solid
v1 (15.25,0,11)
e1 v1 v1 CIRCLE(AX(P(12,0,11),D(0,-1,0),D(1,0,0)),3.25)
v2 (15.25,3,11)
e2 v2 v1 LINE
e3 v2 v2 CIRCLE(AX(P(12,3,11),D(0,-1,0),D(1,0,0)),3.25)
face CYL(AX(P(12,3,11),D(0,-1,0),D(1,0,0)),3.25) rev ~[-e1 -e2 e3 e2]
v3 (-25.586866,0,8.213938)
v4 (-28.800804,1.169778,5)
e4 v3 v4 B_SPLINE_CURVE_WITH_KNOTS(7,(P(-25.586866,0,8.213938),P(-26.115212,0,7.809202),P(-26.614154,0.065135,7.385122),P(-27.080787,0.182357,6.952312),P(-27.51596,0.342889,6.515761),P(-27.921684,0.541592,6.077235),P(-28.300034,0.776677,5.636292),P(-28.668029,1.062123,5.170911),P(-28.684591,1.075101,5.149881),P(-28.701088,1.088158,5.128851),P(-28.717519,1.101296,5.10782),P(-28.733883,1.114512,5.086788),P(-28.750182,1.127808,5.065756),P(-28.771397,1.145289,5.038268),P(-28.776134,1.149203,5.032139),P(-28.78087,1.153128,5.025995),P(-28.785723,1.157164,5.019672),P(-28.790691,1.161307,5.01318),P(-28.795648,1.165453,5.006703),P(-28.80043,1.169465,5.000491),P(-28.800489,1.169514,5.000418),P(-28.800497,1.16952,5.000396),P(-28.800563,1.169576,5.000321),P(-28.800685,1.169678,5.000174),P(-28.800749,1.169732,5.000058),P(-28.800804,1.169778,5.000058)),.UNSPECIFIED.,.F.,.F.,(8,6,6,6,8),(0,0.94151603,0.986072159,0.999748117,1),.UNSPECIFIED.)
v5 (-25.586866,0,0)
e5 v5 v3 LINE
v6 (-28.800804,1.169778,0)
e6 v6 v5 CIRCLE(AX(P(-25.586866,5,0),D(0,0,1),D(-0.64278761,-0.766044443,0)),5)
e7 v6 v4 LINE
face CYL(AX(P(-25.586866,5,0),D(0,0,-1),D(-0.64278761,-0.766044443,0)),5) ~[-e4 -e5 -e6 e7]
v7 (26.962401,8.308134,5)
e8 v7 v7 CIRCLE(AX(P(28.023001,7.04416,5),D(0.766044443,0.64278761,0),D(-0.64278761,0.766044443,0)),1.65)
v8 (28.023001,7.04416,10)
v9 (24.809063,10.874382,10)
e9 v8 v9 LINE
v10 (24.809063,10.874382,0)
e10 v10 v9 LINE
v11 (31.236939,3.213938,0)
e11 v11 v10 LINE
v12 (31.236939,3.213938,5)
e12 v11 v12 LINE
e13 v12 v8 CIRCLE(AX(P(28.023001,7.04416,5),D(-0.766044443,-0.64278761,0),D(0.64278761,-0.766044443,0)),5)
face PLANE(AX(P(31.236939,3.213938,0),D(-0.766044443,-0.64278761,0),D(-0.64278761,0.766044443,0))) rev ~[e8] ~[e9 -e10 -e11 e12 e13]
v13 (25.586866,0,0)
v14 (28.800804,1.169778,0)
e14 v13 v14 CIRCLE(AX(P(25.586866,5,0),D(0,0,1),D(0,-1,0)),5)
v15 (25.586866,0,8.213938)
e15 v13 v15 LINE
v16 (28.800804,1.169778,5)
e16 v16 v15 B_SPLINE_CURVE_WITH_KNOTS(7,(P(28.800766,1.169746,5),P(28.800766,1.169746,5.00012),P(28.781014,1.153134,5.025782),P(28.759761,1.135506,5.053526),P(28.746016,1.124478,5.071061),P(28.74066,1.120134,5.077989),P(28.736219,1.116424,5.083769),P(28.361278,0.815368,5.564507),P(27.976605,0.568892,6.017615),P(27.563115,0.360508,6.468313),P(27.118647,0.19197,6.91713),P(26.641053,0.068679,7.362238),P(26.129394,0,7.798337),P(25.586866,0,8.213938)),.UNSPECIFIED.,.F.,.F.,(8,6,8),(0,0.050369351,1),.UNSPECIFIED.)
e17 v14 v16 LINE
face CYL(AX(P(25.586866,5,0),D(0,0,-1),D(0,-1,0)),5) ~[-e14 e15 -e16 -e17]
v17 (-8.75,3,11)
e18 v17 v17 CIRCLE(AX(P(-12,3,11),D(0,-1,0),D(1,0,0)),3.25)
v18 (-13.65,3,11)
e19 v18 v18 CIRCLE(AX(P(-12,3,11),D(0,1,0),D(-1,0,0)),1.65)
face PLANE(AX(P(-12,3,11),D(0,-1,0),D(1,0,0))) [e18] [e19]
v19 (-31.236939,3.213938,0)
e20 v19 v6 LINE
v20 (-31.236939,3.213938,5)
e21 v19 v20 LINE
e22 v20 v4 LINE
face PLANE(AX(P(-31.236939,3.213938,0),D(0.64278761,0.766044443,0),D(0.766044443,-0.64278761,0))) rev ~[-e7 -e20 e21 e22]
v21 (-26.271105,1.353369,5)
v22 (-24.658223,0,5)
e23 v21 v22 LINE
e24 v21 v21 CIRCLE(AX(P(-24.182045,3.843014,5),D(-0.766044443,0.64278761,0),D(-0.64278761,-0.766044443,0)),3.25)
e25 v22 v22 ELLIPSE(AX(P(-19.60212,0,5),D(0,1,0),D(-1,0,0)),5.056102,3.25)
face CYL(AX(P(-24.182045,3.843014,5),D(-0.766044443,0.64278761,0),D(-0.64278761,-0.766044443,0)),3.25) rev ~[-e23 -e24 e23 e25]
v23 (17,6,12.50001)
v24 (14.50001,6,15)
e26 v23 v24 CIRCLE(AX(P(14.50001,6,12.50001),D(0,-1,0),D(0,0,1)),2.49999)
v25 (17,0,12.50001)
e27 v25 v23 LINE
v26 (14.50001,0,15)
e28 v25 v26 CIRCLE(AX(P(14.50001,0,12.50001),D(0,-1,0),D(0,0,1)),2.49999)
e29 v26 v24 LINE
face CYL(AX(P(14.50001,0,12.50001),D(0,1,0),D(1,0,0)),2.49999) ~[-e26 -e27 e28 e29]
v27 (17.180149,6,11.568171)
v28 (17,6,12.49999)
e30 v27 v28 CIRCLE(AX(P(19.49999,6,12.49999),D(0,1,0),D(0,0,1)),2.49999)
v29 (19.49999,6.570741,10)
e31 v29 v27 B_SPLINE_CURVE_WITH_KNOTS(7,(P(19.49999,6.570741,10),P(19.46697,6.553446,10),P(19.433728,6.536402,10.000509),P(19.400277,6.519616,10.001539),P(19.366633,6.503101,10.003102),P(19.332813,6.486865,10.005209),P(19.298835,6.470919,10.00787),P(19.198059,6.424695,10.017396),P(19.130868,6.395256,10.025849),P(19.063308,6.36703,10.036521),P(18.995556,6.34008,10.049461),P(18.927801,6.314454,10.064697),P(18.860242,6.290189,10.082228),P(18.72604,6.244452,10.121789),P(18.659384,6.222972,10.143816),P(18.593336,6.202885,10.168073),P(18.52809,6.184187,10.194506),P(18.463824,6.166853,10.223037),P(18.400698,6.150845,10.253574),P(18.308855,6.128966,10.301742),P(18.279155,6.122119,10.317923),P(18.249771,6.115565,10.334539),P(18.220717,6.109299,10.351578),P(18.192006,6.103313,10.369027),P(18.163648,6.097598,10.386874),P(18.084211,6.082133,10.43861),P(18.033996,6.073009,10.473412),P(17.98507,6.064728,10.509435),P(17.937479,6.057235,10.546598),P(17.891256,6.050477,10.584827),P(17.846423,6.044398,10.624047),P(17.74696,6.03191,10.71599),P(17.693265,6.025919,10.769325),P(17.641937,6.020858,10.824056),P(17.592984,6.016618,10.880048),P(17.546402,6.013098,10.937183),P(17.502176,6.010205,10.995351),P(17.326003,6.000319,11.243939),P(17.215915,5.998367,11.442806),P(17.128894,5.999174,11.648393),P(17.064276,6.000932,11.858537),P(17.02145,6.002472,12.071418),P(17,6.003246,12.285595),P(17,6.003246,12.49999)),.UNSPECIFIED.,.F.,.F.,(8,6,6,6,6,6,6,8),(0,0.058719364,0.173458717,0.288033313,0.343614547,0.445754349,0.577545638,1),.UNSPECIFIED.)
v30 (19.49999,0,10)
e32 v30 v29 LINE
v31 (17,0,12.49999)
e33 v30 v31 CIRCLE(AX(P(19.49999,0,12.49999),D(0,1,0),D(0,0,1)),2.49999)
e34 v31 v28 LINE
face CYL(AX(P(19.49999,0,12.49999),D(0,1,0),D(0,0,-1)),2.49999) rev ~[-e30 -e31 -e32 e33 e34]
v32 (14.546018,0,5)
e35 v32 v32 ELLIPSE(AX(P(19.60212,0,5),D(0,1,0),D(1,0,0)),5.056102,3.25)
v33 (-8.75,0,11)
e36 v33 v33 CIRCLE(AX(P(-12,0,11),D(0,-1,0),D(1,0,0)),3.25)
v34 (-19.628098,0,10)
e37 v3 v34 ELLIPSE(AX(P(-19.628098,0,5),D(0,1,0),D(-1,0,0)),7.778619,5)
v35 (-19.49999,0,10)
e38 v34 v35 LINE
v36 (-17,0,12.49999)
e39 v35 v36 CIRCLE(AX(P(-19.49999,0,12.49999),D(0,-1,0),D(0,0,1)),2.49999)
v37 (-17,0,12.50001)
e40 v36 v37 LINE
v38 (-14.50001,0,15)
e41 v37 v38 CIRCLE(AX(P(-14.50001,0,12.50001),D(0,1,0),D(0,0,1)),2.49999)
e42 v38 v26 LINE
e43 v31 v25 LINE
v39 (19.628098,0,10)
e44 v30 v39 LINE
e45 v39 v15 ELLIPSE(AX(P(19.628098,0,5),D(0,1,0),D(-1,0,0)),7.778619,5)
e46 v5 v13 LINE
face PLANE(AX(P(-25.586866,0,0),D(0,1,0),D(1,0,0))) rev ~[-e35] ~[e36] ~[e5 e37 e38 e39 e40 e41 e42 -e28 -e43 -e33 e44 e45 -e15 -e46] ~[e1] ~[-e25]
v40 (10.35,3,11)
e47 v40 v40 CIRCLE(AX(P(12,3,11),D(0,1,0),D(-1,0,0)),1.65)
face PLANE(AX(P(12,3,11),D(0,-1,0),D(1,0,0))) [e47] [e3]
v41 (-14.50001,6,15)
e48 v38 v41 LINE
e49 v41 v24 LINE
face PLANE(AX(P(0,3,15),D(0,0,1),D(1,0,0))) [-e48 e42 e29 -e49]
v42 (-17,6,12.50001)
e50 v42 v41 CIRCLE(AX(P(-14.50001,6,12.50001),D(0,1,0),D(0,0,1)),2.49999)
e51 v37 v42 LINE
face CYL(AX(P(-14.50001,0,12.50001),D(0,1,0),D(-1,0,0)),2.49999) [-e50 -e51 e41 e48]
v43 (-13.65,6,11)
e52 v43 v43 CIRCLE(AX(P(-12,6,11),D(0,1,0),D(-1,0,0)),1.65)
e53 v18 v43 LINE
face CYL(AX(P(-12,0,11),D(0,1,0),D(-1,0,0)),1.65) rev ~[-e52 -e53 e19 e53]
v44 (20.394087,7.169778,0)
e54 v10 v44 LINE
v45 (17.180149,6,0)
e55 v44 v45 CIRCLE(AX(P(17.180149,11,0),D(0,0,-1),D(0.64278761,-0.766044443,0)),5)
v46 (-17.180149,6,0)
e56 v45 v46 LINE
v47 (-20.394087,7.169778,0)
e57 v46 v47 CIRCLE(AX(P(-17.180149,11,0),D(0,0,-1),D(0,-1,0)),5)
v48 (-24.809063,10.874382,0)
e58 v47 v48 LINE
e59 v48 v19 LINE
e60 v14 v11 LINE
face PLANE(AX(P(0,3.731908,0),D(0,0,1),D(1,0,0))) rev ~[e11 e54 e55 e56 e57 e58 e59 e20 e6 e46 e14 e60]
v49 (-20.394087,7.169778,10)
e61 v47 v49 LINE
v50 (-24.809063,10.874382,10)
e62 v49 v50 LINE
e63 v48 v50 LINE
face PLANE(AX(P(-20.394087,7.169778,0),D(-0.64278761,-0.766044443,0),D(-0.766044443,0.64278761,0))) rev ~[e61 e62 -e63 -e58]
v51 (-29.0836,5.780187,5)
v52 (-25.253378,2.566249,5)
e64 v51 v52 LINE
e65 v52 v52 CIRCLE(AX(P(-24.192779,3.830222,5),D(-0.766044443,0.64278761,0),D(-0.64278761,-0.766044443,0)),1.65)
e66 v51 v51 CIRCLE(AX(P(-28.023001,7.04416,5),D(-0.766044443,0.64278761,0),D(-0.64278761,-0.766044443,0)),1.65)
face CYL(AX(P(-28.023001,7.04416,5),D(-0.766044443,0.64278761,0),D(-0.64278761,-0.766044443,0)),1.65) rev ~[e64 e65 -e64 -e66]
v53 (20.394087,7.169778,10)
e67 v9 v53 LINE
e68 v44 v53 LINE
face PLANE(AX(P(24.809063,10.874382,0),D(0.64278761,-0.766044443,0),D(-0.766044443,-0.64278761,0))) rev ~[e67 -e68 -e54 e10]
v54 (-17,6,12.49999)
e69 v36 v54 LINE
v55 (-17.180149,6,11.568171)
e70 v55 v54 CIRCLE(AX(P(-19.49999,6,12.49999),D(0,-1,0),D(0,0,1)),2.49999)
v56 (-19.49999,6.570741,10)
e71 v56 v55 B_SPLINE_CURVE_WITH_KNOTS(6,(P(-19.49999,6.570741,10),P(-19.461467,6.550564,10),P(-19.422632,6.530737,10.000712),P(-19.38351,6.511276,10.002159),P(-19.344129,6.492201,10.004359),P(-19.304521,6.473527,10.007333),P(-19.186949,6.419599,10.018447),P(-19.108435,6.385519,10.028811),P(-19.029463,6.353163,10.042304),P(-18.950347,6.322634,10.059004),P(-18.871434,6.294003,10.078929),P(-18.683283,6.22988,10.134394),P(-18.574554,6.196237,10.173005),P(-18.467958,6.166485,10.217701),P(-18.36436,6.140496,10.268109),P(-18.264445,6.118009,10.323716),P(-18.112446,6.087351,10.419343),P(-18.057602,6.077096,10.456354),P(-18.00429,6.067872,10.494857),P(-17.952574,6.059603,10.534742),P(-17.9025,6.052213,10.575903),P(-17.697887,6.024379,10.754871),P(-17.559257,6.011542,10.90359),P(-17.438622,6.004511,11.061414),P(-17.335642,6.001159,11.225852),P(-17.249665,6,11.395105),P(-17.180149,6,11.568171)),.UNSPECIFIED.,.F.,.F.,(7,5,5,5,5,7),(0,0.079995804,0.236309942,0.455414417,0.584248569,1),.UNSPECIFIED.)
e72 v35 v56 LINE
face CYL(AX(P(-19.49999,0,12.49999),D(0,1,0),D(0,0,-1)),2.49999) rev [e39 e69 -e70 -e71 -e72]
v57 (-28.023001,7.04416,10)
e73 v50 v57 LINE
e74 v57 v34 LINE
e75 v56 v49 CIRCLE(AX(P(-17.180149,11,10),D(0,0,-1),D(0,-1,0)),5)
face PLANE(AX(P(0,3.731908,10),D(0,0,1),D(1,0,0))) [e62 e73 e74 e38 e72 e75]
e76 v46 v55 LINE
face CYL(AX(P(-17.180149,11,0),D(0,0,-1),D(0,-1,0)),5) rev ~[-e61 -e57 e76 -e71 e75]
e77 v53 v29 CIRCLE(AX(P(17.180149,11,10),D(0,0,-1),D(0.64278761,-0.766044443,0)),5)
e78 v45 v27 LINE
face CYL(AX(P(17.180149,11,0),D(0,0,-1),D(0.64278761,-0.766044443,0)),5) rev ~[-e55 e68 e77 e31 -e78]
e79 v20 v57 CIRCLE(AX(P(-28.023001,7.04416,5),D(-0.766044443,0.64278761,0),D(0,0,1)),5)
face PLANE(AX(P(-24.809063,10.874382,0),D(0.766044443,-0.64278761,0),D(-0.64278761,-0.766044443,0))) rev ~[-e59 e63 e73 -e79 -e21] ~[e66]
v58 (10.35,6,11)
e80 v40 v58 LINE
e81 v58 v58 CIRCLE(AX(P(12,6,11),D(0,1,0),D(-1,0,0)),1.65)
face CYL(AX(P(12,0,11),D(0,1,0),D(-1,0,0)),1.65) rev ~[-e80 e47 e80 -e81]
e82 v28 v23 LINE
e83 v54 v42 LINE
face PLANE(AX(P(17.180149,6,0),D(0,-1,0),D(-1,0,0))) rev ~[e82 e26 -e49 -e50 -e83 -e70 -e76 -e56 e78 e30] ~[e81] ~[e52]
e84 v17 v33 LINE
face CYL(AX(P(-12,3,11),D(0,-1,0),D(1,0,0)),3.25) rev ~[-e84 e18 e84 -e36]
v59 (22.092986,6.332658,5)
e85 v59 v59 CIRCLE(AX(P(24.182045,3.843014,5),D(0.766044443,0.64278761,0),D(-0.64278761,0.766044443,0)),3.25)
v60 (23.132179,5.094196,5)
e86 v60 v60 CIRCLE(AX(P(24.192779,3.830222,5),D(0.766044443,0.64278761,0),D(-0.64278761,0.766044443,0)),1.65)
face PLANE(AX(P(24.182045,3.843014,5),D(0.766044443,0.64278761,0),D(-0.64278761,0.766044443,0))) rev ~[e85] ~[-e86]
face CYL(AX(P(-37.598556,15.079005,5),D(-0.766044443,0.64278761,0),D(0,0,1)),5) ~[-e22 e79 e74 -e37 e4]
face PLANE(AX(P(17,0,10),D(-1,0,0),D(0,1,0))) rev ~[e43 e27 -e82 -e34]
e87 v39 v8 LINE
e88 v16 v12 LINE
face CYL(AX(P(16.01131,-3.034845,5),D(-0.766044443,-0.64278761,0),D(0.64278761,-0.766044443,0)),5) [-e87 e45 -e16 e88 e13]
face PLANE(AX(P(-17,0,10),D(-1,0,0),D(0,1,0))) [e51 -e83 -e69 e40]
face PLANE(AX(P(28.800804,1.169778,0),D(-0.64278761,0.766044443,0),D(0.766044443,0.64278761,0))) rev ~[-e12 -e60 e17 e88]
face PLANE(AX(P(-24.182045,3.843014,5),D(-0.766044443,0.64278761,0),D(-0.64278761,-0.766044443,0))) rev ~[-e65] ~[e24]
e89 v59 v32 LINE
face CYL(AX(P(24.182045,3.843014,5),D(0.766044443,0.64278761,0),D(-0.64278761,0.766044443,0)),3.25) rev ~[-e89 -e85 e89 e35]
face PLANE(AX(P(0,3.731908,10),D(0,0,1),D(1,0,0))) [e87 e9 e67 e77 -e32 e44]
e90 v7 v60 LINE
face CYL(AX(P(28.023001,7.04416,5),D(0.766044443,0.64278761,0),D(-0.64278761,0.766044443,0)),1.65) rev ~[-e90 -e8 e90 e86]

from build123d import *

# Parameters (mm, degrees)
F1_DEPTH       = 10
F2_W           = 34
F2_H           = 6
F3_DEPTH       = 5
F5_R           = 2.49999
F6_D           = 3.3
F6_CBORE_D     = 6.5
F6_CBORE_DEPTH = 3
F7_T1_DEPTH    = 28.1801488287
F7_T3_DEPTH    = 28.1801488287
F8_R           = 1.65
F9_DEPTH       = 49.9246466694
F10_R          = 1.65
F11_DEPTH      = 49.9246466694
F13_R          = 3.25
F14_DEPTH      = 25
F16_R          = 3.25
F17_DEPTH      = 25


# Not quite as in the source:
# - a fillet or chamfer that OpenCascade refuses, or shapes differently, is made with other operations: its cross-section is extruded or revolved along the edge and cut away or added
# - a fillet or chamfer is up to 0.001 mm smaller than in the source, because OpenCascade refuses the exact size


with BuildPart() as f1:
    # F0 (on Top) → F1 (new body)
    with BuildSketch(Plane.XY):
        with BuildLine():
            Line((-25.5868655417, 0), (0, 0))
            Line((0, 0), (25.5868655417, 0))
            ThreePointArc((25.5868655417, 0), (27.2969662583, 0.3015368961), (28.8008035901, 1.1697777844))
            Line((28.8008035901, 1.1697777844), (31.2369389286, 3.2139380484))
            Line((31.2369389286, 3.2139380484), (24.8090628318, 10.8743824796))
            Line((24.8090628318, 10.8743824796), (20.3940868771, 7.1697777844))
            ThreePointArc((20.3940868771, 7.1697777844), (18.8902495453, 6.3015368961), (17.1801488287, 6))
            Line((17.1801488287, 6), (0, 6))
            Line((0, 6), (-17.1801488287, 6))
            ThreePointArc((-17.1801488287, 6), (-18.8902495453, 6.3015368961), (-20.3940868771, 7.1697777844))
            Line((-20.3940868771, 7.1697777844), (-24.8090628318, 10.8743824796))
            Line((-24.8090628318, 10.8743824796), (-31.2369389286, 3.2139380484))
            Line((-31.2369389286, 3.2139380484), (-28.8008035901, 1.1697777844))
            ThreePointArc((-28.8008035901, 1.1697777844), (-27.2969662583, 0.3015368961), (-25.5868655417, 0))
        make_face()
    extrude(amount=F1_DEPTH)

    # F2 (on face) → F3 (join)
    with BuildSketch(Plane.XY.offset(10)):
        with Locations((0, 3)):
            Rectangle(F2_W, F2_H)
    extrude(amount=F3_DEPTH)

    # F5 (radius 2.5 in the source; OpenCascade refuses exactly that, so slightly less here)
    f5_edges = [f1.edges().sort_by_distance(p)[0] for p in [
        (17, 3, 10),
        (17, 3, 15),
        (-17, 3, 15),
        (-17, 3, 10),
    ]]
    fillet(f5_edges, radius=F5_R)

    # F6 (through all)
    with Locations(Plane.XZ):
        with Locations((-12, 11), (12, 11)):
            CounterBoreHole(F6_D / 2, F6_CBORE_D / 2, F6_CBORE_DEPTH)

    # F7: fillet of radius 5 on 2 edges, made by hand

    # F7_s2 → F7_t1 (cut)
    with BuildSketch(Plane(origin=(-29.4886993176, 24.7439567213, 0), x_dir=(0, 0, 1), z_dir=(0.7660444431, -0.6427876097, 0))):
        with BuildLine():
            ThreePointArc((10, 12.6166979253), (8.5355339059, 16.1522318313), (5, 17.6166979253))
            Line((5, 17.6166979253), (10, 17.6166979253))
            Line((10, 17.6166979253), (10, 12.6166979253))
        make_face()
    extrude(amount=F7_T1_DEPTH, mode=Mode.SUBTRACT)

    # F7_s4 → F7_t3 (cut)
    with BuildSketch(Plane(origin=(7.9014529012, 6.6301062151, 0), x_dir=(0, 0, 1), z_dir=(0.7660444431, 0.6427876097, 0))):
        with BuildLine():
            ThreePointArc((5, 17.6166979253), (8.5355339059, 16.1522318313), (10, 12.6166979253))
            Line((10, 12.6166979253), (10, 17.6166979253))
            Line((10, 17.6166979253), (5, 17.6166979253))
        make_face()
    extrude(amount=F7_T3_DEPTH, mode=Mode.SUBTRACT)

    # F8 (on face) → F9 (cut, through all)
    with BuildSketch(Plane(origin=(19.9131437786, 16.7091116002, 0), x_dir=(-0.6427876097, 0.7660444431, 0), z_dir=(0.7660444431, 0.6427876097, 0))):
        with Locations((-12.6166979253, 5)):
            Circle(F8_R)
    extrude(amount=-F9_DEPTH, mode=Mode.SUBTRACT)

    # F10 (on face) → F11 (cut, through all)
    with BuildSketch(Plane(origin=(-19.9131437786, 16.7091116002, 0), x_dir=(-0.6427876097, -0.7660444431, 0), z_dir=(-0.7660444431, 0.6427876097, 0))):
        with Locations((12.6166979253, 5)):
            Circle(F10_R)
    extrude(amount=-F11_DEPTH, mode=Mode.SUBTRACT)

    # F13 (on offset) → F14 (cut)
    with BuildSketch(Plane(origin=(16.082921563, 13.4951735518, 0), x_dir=(-0.6427876097, 0.7660444431, 0), z_dir=(0.7660444431, 0.6427876097, 0))):
        with Locations((-12.6, 5)):
            Circle(F13_R)
    extrude(amount=-F14_DEPTH, mode=Mode.SUBTRACT)

    # F16 (on offset) → F17 (cut)
    with BuildSketch(Plane(origin=(-16.082921563, 13.4951735518, 0), x_dir=(-0.6427876097, -0.7660444431, 0), z_dir=(-0.7660444431, 0.6427876097, 0))):
        with Locations((12.6, 5)):
            Circle(F16_R)
    extrude(amount=-F17_DEPTH, mode=Mode.SUBTRACT)


solid = f1.part
